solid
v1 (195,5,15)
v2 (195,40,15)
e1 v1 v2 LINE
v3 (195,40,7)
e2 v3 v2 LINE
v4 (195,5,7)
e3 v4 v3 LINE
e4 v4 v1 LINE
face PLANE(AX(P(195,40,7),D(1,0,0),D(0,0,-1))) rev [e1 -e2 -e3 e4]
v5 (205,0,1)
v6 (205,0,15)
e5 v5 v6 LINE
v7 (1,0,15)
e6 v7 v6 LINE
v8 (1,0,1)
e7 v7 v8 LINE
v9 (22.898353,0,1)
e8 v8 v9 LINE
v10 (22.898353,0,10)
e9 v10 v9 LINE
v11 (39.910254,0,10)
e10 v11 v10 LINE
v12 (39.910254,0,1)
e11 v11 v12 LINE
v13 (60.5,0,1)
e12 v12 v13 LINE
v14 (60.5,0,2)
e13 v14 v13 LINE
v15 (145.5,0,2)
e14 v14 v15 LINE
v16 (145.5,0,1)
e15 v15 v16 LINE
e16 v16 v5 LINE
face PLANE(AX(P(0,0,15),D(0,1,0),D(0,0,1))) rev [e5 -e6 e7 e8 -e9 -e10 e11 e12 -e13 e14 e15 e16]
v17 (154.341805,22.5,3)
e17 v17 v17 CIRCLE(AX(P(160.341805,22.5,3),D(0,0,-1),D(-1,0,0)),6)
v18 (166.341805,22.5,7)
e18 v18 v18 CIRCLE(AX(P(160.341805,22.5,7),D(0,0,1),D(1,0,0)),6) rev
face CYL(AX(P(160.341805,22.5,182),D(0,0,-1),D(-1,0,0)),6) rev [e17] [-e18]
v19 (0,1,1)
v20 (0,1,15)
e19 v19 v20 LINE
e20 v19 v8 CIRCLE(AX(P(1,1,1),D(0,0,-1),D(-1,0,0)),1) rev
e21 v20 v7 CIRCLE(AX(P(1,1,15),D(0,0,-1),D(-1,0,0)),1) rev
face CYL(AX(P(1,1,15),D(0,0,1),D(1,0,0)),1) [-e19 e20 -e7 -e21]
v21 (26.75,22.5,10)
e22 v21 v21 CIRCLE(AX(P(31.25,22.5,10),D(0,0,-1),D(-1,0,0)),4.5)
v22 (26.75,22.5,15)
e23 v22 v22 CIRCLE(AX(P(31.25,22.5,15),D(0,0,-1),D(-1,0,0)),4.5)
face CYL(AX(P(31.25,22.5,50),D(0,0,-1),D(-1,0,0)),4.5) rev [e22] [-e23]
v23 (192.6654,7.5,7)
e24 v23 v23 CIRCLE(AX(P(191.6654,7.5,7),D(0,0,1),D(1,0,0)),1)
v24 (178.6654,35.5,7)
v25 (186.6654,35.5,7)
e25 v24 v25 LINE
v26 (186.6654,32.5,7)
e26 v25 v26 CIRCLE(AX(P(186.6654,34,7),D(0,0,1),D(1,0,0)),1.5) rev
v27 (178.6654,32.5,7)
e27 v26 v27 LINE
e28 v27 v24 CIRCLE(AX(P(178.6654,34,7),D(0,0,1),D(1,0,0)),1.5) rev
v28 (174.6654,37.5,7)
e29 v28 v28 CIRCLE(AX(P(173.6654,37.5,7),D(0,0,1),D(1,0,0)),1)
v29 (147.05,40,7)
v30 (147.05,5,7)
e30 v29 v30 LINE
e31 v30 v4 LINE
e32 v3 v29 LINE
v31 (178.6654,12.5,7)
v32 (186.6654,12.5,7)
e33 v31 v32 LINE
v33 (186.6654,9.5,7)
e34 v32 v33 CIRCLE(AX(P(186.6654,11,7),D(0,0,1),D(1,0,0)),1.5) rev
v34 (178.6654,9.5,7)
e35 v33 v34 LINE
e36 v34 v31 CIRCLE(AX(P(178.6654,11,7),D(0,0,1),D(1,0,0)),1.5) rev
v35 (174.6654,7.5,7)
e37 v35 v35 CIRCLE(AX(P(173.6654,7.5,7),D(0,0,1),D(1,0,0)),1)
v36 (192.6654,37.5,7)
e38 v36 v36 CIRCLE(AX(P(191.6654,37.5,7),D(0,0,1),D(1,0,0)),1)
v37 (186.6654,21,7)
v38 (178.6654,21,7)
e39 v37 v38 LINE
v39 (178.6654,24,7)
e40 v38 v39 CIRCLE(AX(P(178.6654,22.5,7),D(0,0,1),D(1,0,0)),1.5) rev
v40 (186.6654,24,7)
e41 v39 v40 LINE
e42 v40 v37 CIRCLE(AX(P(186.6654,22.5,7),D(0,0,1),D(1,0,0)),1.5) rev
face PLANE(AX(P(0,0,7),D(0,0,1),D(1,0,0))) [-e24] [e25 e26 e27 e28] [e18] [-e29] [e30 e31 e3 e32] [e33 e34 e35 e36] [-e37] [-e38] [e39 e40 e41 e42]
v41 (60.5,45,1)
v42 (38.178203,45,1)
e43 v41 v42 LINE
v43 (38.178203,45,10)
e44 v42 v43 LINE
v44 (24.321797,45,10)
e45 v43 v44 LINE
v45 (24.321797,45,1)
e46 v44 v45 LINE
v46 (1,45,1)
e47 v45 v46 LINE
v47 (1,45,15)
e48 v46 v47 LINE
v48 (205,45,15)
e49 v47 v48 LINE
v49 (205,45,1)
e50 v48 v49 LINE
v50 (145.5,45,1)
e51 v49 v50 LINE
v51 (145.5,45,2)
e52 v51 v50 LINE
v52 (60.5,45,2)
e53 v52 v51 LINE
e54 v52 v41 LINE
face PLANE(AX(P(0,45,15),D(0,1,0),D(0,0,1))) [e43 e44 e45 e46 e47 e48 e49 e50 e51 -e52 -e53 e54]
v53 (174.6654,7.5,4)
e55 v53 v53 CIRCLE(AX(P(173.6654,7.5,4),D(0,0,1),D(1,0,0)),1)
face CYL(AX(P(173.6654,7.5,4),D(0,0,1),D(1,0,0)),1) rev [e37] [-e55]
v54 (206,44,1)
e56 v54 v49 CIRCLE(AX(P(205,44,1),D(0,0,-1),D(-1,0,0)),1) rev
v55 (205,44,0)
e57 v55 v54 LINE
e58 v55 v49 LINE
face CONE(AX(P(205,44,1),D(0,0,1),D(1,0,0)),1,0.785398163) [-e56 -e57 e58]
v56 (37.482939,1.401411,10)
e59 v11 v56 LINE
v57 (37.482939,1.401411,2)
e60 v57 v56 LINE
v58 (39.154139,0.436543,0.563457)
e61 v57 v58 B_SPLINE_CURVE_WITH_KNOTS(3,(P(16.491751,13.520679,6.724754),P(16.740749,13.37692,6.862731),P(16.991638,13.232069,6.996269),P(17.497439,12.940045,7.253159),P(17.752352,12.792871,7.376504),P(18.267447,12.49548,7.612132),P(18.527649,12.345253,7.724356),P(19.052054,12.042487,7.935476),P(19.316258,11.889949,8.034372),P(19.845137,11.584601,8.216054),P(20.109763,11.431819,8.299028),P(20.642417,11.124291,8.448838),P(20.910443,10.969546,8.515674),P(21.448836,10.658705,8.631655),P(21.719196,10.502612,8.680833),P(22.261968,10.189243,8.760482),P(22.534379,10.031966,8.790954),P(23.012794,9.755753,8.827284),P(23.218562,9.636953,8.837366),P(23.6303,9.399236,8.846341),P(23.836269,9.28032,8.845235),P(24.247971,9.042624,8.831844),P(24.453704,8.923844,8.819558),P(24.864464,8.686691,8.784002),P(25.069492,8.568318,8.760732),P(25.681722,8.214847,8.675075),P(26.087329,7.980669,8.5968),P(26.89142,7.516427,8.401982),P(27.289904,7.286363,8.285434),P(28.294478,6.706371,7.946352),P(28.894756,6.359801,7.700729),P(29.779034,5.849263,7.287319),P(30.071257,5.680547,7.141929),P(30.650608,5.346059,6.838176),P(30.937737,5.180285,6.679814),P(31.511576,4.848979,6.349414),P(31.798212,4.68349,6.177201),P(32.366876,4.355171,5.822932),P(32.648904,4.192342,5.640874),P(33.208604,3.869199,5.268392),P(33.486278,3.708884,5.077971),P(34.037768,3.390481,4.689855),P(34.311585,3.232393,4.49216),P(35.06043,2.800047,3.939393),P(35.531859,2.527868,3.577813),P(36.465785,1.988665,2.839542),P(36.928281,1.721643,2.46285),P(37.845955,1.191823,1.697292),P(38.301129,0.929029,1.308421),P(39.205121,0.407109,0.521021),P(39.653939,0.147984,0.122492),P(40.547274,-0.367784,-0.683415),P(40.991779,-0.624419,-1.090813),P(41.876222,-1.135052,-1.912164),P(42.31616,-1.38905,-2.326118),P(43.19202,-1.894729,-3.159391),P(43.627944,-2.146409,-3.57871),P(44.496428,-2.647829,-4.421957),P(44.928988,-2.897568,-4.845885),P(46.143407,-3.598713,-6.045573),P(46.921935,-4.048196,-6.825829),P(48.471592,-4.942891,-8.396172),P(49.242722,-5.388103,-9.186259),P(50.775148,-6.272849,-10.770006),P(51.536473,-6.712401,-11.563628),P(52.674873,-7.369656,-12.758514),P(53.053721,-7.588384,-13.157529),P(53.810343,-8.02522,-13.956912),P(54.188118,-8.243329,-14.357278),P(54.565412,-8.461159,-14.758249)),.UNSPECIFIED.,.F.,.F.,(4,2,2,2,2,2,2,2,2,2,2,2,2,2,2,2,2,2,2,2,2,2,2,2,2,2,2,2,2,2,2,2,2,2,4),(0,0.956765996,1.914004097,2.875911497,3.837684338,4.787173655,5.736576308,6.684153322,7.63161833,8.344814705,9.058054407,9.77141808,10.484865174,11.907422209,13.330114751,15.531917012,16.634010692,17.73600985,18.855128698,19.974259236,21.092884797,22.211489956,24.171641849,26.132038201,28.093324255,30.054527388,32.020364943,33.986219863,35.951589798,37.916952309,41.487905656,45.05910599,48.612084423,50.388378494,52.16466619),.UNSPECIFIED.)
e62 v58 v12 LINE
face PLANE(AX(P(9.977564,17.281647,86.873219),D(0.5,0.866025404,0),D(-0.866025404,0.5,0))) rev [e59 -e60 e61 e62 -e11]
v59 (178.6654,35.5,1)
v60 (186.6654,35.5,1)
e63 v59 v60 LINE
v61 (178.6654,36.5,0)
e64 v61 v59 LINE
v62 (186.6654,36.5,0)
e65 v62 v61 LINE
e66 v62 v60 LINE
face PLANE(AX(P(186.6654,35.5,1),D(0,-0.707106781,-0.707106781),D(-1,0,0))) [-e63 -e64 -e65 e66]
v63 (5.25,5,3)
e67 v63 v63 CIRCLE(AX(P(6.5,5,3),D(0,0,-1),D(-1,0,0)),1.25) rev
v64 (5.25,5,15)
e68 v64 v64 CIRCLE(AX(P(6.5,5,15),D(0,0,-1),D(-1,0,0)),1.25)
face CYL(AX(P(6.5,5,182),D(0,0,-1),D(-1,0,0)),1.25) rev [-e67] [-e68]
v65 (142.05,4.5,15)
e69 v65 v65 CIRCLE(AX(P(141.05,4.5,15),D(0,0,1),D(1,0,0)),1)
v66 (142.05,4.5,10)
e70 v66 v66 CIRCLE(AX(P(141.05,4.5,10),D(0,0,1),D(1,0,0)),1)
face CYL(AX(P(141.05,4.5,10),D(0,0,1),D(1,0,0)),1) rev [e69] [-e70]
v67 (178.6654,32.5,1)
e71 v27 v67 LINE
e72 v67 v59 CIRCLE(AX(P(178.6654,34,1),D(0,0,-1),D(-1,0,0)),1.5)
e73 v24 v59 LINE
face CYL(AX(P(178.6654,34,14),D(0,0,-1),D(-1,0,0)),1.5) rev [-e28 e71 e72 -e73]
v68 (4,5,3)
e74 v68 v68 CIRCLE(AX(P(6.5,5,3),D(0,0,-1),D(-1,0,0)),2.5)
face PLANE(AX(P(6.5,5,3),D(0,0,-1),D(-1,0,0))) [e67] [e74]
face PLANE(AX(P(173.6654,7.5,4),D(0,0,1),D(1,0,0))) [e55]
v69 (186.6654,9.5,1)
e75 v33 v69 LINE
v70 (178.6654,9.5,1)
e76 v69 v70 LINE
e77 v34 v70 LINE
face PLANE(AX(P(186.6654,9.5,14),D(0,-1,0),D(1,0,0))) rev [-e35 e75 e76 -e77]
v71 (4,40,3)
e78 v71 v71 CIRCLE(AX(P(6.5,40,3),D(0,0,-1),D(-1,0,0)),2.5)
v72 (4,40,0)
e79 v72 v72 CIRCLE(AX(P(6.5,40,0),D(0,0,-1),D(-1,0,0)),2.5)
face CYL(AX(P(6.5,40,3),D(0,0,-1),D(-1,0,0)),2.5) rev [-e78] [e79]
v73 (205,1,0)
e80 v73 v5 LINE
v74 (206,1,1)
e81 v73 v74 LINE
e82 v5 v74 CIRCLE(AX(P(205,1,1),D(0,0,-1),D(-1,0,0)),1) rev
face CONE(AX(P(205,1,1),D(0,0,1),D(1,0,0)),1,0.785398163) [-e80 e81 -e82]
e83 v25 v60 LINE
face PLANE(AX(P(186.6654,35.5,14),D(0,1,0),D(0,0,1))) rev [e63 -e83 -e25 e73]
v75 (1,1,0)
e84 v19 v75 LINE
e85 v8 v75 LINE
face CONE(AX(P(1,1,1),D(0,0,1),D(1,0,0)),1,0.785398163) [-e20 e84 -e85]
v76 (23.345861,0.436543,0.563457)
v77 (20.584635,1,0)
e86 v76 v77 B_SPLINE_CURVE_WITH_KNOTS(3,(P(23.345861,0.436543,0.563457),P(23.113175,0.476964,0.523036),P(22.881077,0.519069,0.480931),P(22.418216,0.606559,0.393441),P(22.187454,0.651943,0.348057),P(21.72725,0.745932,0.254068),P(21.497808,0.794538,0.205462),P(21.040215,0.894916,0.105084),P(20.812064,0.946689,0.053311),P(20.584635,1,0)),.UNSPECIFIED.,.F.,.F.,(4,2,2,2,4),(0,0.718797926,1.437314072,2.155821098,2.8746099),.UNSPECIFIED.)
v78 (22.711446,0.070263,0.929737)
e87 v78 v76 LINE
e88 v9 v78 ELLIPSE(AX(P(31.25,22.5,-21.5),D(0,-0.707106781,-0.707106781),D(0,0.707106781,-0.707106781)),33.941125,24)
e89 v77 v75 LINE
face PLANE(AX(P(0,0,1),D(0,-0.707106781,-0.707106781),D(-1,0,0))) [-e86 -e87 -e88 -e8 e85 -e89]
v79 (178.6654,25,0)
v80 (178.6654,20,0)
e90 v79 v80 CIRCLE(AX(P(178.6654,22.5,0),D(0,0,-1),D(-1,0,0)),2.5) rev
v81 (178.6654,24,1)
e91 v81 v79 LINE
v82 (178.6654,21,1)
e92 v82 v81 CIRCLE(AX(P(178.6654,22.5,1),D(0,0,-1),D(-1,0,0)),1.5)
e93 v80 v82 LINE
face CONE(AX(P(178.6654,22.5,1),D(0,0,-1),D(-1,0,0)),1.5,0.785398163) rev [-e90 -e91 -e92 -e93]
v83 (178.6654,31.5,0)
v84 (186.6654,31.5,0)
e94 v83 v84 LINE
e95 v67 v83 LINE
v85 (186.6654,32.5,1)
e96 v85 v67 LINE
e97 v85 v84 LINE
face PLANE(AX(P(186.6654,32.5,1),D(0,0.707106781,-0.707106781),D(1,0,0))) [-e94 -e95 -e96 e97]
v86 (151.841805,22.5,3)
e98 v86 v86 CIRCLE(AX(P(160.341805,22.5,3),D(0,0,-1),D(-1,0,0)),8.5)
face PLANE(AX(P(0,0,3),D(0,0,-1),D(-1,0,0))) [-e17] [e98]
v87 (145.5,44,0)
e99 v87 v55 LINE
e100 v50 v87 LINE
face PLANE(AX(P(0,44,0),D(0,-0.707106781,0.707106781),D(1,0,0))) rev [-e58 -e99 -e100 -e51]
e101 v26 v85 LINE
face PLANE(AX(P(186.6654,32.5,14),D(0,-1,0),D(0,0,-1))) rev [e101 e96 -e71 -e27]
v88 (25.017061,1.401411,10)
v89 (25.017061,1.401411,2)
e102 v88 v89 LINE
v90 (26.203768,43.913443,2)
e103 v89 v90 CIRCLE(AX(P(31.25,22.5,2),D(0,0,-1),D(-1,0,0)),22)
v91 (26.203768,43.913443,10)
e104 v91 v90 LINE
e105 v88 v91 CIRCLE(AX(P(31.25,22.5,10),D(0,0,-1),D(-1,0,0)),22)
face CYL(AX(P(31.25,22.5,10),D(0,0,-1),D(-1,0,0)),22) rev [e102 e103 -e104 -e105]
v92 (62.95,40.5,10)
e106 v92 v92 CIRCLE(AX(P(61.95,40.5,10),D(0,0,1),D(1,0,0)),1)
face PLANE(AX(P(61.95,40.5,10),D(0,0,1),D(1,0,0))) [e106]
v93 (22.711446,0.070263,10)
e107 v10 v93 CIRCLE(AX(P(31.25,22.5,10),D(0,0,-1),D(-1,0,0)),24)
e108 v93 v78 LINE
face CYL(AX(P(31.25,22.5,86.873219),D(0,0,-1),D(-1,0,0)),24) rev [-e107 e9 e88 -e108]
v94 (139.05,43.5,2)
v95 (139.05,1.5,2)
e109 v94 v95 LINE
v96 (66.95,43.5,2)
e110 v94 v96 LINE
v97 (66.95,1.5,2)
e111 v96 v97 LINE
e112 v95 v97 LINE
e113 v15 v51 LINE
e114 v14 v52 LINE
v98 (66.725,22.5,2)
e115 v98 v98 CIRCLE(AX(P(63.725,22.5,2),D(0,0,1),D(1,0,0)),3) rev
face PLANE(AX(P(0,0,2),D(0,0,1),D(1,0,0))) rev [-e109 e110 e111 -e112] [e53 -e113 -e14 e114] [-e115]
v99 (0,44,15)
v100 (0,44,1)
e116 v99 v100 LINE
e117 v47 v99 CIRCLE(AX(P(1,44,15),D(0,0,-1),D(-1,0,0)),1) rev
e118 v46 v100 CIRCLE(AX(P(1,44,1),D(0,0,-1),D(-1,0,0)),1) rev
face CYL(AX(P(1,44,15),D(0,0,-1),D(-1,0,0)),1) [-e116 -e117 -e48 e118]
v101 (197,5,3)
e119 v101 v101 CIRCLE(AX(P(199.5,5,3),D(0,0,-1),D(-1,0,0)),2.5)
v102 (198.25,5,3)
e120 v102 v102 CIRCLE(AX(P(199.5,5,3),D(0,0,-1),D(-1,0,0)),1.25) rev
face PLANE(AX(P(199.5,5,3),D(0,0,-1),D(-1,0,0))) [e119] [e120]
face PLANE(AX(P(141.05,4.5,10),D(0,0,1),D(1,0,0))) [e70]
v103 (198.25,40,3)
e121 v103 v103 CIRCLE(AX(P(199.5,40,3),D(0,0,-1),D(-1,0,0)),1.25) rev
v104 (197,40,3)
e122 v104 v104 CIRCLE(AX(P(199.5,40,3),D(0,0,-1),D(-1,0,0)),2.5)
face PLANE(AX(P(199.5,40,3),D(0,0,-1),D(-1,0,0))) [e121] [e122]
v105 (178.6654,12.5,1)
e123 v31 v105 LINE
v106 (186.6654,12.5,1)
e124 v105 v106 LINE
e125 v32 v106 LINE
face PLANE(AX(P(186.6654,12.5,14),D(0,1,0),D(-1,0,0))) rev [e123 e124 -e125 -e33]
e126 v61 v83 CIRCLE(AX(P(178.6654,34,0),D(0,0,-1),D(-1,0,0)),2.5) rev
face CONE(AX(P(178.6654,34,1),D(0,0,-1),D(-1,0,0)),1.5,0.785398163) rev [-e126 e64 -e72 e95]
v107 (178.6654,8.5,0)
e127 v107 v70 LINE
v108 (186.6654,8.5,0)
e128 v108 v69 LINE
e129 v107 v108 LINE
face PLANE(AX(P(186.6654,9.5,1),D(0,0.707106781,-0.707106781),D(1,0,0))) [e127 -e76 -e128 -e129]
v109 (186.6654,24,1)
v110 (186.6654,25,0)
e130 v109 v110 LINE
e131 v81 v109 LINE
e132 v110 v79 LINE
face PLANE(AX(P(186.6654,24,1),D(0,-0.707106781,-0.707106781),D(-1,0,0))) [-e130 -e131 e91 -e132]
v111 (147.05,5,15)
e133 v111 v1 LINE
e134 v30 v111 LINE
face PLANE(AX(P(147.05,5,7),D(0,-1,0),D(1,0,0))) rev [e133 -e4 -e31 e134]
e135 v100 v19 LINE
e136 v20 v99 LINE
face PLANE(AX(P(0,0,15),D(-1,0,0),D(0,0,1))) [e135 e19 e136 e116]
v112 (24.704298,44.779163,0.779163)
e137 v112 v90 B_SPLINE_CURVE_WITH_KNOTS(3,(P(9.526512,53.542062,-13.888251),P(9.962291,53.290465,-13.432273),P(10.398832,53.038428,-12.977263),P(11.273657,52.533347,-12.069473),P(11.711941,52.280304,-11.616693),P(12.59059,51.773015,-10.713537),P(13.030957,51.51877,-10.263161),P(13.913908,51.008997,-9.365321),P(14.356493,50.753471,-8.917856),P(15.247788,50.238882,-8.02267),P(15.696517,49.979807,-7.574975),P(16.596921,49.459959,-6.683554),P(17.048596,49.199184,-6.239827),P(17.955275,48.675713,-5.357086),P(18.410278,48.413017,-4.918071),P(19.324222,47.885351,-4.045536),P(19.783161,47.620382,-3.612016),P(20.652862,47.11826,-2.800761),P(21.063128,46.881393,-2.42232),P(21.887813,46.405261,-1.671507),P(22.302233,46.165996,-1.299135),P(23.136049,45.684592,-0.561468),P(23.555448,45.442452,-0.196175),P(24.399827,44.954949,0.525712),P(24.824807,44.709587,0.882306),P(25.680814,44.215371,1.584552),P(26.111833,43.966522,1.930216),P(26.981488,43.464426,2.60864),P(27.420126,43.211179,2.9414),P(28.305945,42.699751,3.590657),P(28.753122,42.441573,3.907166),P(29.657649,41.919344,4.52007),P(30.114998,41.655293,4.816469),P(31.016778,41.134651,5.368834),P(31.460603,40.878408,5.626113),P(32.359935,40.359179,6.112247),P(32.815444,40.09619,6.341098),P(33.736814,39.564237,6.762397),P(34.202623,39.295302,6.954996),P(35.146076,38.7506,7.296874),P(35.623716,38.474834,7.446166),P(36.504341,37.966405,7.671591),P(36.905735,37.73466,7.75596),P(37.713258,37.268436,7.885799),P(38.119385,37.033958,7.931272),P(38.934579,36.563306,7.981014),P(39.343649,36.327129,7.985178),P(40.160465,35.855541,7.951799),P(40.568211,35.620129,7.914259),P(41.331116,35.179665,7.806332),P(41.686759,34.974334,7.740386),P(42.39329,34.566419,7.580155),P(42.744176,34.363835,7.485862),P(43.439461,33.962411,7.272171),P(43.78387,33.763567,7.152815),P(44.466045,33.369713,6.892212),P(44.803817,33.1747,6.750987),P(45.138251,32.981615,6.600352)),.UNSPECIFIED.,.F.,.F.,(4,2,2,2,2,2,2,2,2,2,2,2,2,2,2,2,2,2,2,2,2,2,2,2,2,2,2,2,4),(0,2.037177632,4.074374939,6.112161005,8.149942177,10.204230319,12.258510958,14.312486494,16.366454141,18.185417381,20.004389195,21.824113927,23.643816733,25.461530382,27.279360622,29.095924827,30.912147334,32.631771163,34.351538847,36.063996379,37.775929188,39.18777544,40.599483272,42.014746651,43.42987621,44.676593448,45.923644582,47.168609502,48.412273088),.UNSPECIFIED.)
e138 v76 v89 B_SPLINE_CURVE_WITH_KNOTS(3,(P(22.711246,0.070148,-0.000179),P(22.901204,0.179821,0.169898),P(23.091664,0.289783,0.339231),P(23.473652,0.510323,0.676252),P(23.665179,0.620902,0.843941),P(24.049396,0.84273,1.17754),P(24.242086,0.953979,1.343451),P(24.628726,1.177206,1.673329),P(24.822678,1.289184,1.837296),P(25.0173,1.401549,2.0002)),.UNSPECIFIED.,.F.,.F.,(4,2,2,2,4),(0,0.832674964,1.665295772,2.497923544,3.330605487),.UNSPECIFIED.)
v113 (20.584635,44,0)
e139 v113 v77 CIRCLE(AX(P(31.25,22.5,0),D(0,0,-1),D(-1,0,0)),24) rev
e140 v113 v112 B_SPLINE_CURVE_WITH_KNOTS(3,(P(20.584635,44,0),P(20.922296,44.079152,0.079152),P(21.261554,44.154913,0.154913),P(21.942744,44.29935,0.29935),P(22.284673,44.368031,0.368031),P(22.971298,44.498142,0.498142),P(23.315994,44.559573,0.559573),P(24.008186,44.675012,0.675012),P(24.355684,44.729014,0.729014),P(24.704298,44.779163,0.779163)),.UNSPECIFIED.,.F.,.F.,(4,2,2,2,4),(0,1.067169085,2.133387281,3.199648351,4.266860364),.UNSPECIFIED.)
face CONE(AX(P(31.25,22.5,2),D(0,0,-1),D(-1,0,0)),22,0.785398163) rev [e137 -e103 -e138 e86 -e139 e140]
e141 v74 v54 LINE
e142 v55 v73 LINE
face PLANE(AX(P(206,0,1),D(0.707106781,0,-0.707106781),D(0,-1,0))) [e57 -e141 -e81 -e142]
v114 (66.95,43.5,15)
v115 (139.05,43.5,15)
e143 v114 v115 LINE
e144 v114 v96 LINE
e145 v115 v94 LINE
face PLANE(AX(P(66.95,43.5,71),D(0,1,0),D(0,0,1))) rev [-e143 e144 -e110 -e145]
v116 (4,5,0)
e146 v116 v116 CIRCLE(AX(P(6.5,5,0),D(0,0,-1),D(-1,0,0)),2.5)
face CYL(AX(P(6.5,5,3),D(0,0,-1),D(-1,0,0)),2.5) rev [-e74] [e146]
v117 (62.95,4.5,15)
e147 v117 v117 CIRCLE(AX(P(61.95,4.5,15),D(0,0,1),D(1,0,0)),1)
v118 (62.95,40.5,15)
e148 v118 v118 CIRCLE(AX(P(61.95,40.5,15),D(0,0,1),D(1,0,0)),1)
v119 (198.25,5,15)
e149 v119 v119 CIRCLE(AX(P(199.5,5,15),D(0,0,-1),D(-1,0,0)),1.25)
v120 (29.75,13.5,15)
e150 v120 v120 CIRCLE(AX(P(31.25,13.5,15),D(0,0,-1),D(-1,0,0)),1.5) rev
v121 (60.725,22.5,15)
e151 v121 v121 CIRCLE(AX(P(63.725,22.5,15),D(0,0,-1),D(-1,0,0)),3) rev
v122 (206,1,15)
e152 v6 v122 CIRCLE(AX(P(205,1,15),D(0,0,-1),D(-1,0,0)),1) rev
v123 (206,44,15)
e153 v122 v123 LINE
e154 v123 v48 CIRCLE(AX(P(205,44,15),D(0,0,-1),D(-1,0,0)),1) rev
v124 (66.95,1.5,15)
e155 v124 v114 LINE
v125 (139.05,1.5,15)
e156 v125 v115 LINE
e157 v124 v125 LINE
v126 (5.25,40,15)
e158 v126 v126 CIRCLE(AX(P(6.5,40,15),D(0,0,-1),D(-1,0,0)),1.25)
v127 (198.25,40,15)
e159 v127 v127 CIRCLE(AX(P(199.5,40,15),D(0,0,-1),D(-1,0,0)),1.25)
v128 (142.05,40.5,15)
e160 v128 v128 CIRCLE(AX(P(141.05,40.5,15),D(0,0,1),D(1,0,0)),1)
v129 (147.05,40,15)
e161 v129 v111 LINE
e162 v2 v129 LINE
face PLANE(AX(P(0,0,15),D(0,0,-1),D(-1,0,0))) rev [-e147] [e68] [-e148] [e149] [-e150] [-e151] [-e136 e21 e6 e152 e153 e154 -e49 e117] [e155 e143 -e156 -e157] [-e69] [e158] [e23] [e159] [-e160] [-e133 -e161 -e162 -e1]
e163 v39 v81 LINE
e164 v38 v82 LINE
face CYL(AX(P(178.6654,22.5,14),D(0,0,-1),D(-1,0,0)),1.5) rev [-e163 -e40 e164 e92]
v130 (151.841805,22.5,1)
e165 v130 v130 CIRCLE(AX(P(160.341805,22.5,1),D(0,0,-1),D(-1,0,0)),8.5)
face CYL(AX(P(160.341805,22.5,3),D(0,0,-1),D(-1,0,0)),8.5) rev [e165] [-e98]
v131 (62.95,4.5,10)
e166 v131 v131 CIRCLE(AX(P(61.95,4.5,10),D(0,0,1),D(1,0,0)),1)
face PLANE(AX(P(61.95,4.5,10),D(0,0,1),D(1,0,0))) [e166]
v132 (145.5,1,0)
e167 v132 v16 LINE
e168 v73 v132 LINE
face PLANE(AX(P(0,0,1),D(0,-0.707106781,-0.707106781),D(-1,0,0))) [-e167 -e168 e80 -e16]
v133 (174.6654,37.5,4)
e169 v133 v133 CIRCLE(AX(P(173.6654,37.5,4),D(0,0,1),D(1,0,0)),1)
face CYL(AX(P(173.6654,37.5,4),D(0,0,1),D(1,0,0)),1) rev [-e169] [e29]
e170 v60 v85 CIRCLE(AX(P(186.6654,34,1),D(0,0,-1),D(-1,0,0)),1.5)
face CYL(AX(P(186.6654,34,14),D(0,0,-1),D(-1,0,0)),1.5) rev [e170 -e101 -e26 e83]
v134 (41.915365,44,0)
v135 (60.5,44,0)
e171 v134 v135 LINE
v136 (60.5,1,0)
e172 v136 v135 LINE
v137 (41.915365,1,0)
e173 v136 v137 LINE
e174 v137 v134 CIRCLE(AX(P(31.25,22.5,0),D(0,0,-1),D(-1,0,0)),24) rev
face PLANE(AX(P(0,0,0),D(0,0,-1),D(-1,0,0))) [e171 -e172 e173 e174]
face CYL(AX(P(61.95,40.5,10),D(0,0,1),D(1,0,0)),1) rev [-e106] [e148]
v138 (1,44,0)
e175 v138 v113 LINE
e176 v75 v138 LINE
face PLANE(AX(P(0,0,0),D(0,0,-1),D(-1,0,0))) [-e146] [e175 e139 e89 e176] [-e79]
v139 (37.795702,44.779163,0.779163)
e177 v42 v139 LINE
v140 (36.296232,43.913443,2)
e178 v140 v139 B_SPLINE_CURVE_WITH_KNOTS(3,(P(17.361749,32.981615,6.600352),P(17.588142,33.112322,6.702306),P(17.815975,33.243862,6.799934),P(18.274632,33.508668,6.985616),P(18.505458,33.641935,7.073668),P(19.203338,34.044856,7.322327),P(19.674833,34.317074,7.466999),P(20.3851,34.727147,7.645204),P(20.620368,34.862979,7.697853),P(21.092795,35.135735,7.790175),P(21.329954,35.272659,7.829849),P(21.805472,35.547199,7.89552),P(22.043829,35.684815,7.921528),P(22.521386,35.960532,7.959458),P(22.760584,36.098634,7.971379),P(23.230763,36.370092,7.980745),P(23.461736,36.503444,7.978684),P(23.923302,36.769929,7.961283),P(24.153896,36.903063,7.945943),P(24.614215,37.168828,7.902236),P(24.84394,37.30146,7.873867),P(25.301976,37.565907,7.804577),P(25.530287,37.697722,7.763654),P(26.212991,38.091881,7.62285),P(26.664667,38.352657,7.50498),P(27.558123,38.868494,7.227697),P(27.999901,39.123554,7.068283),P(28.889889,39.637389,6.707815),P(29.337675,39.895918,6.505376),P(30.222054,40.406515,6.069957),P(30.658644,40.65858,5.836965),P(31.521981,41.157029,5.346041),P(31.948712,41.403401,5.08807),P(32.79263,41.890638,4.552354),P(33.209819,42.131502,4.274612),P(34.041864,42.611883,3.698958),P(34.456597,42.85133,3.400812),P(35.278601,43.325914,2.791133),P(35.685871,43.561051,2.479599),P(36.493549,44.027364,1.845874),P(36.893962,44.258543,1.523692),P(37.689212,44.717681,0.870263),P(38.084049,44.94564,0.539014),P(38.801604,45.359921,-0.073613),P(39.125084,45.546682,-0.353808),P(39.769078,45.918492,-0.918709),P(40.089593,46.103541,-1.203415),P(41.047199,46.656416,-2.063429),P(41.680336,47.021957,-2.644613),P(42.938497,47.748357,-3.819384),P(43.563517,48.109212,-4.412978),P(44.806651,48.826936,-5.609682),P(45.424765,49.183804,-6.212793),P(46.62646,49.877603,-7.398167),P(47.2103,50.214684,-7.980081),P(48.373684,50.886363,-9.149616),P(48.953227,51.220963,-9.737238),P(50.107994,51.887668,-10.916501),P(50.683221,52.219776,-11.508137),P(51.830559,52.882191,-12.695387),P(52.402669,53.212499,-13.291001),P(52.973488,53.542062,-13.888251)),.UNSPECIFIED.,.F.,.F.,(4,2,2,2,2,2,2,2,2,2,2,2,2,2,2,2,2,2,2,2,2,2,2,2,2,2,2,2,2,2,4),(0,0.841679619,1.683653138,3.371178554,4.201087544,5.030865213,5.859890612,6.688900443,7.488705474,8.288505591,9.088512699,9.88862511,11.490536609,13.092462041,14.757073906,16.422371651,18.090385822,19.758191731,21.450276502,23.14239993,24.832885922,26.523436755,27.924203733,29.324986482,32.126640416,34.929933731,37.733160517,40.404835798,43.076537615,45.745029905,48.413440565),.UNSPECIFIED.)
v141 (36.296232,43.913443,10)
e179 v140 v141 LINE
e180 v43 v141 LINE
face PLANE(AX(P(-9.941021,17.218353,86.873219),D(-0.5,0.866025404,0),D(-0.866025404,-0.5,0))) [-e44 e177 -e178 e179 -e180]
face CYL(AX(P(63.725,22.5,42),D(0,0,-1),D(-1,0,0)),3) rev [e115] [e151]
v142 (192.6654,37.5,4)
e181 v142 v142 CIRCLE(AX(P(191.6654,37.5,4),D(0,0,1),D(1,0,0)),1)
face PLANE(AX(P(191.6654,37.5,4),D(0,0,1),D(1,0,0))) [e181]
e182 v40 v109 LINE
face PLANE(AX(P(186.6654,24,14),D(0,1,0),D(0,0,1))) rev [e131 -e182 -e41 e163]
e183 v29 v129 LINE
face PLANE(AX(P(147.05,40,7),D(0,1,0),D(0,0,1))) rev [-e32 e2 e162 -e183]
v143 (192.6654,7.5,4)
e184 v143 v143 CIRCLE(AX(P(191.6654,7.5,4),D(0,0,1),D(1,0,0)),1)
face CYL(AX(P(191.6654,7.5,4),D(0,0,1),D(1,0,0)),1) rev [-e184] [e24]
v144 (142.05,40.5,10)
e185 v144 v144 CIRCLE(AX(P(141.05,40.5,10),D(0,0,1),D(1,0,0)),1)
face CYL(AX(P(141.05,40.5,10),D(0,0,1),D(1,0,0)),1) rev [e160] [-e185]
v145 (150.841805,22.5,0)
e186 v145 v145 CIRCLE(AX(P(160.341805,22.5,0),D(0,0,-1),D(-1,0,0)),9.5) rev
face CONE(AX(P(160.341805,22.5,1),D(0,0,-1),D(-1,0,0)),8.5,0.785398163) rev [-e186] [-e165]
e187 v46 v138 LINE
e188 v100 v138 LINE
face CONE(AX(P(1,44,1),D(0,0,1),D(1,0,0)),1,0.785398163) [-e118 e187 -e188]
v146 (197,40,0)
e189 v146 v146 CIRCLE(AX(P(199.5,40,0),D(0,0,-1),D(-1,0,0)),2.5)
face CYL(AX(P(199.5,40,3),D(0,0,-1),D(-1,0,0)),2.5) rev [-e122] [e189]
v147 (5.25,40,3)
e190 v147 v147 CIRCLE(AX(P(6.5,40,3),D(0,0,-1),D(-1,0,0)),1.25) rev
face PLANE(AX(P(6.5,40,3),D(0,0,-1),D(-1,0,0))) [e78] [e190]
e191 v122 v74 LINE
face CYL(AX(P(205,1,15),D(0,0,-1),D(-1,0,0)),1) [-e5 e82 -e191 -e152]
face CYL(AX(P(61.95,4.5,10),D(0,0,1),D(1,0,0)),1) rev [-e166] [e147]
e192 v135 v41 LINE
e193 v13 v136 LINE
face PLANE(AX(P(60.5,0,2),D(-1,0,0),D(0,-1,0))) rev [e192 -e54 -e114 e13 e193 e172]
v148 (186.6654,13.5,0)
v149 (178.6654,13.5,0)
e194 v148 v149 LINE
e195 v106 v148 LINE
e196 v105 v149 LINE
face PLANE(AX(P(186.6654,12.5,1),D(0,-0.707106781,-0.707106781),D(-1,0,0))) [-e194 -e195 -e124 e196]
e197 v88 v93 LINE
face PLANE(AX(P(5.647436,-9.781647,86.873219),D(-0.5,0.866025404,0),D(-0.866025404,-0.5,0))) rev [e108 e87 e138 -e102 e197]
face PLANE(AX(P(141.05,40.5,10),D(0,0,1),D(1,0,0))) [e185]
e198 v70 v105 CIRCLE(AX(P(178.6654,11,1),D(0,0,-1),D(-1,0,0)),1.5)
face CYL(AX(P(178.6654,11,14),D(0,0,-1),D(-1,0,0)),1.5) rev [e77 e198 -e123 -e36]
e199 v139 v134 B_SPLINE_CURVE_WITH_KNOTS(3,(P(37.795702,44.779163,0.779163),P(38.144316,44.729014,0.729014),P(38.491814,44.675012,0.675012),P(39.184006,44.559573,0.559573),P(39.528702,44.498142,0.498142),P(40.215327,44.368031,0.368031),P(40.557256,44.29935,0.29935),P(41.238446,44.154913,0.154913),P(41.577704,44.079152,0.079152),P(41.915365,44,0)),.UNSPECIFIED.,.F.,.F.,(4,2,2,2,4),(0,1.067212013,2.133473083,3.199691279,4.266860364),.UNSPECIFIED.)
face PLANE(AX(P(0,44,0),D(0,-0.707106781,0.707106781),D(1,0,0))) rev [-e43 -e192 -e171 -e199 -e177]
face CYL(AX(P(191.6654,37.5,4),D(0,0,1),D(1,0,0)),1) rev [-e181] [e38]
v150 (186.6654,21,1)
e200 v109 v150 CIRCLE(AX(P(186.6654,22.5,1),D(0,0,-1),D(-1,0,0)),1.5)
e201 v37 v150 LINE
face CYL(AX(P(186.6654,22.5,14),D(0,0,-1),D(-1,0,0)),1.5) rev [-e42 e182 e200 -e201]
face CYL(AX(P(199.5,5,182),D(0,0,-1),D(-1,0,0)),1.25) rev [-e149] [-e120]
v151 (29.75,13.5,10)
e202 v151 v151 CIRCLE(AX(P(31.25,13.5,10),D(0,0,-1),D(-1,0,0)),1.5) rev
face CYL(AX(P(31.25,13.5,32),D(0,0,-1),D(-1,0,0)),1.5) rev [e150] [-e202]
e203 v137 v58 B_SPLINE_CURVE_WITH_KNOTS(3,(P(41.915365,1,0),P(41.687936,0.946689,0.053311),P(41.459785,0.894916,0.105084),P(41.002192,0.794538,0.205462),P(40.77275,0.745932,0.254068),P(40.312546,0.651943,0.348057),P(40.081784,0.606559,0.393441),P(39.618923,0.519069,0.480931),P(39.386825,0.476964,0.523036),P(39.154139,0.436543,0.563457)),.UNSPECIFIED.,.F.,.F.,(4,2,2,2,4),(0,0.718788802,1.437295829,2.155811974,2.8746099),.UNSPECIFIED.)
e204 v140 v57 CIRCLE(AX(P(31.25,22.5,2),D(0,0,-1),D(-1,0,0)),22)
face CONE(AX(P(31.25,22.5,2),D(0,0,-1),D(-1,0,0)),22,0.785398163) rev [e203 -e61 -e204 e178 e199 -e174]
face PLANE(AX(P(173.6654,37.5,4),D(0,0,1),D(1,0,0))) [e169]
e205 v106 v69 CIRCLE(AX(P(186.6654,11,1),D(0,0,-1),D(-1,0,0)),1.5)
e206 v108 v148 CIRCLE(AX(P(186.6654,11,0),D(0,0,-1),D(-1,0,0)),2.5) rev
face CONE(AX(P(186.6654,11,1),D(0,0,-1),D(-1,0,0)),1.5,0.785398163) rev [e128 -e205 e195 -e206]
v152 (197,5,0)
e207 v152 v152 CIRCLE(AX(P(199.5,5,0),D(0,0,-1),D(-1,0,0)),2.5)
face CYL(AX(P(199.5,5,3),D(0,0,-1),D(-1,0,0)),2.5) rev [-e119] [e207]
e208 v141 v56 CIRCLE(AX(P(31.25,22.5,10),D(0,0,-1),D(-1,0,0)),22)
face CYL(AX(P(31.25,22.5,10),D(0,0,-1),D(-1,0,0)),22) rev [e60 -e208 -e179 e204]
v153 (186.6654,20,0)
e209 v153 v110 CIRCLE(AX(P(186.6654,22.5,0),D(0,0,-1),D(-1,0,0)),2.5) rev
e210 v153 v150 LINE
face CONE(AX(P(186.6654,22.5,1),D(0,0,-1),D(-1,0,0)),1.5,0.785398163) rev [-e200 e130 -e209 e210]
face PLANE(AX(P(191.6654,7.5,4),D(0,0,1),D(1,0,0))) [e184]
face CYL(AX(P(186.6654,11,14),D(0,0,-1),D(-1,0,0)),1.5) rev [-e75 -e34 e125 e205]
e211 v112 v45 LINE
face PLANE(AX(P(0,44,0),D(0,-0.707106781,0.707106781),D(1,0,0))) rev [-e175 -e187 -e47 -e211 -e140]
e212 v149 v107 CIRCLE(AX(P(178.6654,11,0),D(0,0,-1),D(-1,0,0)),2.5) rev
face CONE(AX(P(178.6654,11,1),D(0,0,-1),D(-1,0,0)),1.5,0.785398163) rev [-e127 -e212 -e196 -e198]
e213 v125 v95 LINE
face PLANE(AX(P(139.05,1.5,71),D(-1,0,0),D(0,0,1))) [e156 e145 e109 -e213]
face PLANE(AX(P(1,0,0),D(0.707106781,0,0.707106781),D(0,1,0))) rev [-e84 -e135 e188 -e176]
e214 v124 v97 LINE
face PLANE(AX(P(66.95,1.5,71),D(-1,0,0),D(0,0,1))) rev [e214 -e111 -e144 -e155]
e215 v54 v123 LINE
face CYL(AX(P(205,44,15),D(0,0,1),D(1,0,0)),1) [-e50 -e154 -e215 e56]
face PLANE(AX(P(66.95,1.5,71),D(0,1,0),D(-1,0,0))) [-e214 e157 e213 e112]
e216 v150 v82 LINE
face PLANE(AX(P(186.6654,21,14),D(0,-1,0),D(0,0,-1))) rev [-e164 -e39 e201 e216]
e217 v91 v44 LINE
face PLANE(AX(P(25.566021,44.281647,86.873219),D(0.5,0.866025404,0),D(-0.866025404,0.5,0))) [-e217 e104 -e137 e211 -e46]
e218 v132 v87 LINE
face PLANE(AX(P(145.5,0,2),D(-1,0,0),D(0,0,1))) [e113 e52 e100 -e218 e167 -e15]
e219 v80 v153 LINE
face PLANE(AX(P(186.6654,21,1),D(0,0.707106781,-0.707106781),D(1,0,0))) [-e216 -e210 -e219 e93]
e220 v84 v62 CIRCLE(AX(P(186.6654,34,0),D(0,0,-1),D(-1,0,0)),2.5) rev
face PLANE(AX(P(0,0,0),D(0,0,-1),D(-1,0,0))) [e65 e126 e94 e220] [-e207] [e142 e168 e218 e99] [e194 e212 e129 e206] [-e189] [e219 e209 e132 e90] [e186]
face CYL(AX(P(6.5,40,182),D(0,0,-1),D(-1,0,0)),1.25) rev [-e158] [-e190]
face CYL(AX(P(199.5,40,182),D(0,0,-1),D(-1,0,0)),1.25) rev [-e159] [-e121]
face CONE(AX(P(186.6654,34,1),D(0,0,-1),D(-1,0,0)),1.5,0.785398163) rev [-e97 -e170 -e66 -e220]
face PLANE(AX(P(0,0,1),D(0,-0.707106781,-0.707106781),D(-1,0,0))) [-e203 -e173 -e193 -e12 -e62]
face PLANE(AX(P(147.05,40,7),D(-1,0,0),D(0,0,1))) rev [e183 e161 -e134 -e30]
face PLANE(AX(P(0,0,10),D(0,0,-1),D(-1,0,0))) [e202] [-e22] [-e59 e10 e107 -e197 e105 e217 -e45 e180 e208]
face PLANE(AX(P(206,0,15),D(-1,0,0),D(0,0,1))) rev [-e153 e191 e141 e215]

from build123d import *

# Parameters (mm, degrees)
SKETCH_1_W               = 206
SKETCH_1_H               = 45
EXTRUDE_1_DEPTH          = 15
SKETCH_1_4_W             = 85
SKETCH_1_4_H             = 45
CUT_EXTRUDE_1_DEPTH      = 2
SKETCH_1_5_W             = 72.1
SKETCH_1_5_H             = 42
CUT_EXTRUDE_2_DEPTH      = 71
SKETCH_1_6_R             = 3
CUT_EXTRUDE_3_DEPTH      = 42
SKETCH_2_R               = 22
SKETCH_2_R_2             = 4.5
CUT_EXTRUDE_4_DEPTH      = 10
SKETCH_2_3_R             = 4.5
CUT_EXTRUDE_5_DEPTH      = 50
CUT_EXTRUDE_6_DEPTH      = 17
CUT_EXTRUDE_6_DEPTH_BACK = 44
SKETCH_4_R               = 1.5
CUT_EXTRUDE_7_DEPTH      = 14
CHAMFER_1_SIZE           = 1
CHAMFER_2_SIZE           = 2
CUT_EXTRUDE_START        = -10
CUT_EXTRUDE_9_DEPTH      = 11
SKETCH_7_R               = 6
CUT_EXTRUDE_10_DEPTH     = 182
SKETCH_7_4_R             = 8.5
CUT_EXTRUDE_11_DEPTH     = 3
CHAMFER_3_SIZE           = 1
SKETCH_9_R               = 1.25
CUT_EXTRUDE_12_DEPTH     = 182
SKETCH_9_3_R             = 2.5
CUT_EXTRUDE_13_DEPTH     = 3
FILLET_1_R               = 1
SKETCH_10_W              = 47.95
SKETCH_10_H              = 35
CUT_EXTRUDE_14_DEPTH     = 8
SKETCH_11_R              = 1
CUT_EXTRUDE_15_DEPTH     = 3
CHAMFER_4_SIZE           = 1
SKETCH_12_R              = 1
CUT_EXTRUDE_16_DEPTH     = 5


with BuildPart() as part:
    # 草图1 → 凸台-拉伸1 (new body)
    with BuildSketch(Plane.XY):
        with Locations((103, 22.5)):
            Rectangle(SKETCH_1_W, SKETCH_1_H)
    extrude(amount=EXTRUDE_1_DEPTH)

    # 草图1<4> → 切除-拉伸1 (cut)
    with BuildSketch(Plane.XY):
        with Locations((103, 22.5)):
            Rectangle(SKETCH_1_4_W, SKETCH_1_4_H)
    extrude(amount=CUT_EXTRUDE_1_DEPTH, mode=Mode.SUBTRACT)

    # 草图1<5> → 切除-拉伸2 (cut)
    with BuildSketch(Plane.XY):
        with Locations((103, 22.5)):
            Rectangle(SKETCH_1_5_W, SKETCH_1_5_H)
    extrude(amount=CUT_EXTRUDE_2_DEPTH, mode=Mode.SUBTRACT)

    # 草图1<6> → 切除-拉伸3 (cut)
    with BuildSketch(Plane.XY):
        with Locations(Location((63.725, 22.5, 0), (0, 0, 180))):
            Circle(SKETCH_1_6_R)
    extrude(amount=CUT_EXTRUDE_3_DEPTH, mode=Mode.SUBTRACT)

    # 草图2 → 切除-拉伸4 (cut)
    with BuildSketch(Plane(origin=(0, 0, 0), x_dir=(-1, 0, 0), z_dir=(0, 0, -1))):
        with Locations((-31.25, 22.5)):
            Circle(SKETCH_2_R)
        with Locations((-31.25, 22.5)):
            Circle(SKETCH_2_R_2, mode=Mode.SUBTRACT)
    extrude(amount=-CUT_EXTRUDE_4_DEPTH, mode=Mode.SUBTRACT)

    # 草图2<3> → 切除-拉伸5 (cut)
    with BuildSketch(Plane(origin=(0, 0, 0), x_dir=(-1, 0, 0), z_dir=(0, 0, -1))):
        with Locations((-31.25, 22.5)):
            Circle(SKETCH_2_3_R)
    extrude(amount=-CUT_EXTRUDE_5_DEPTH, mode=Mode.SUBTRACT)

    # 草图4 → 切除-拉伸6 (cut, two sides: drawn at the far end of the back side and taken through both)
    with BuildSketch(Plane.XY.offset(15).offset(-CUT_EXTRUDE_6_DEPTH_BACK)):
        with Locations(Location((31.25, 13.5, 0), (0, 0, 180))):
            Circle(SKETCH_4_R)
    extrude(amount=CUT_EXTRUDE_6_DEPTH + CUT_EXTRUDE_6_DEPTH_BACK, mode=Mode.SUBTRACT)

    # 草图5 → 切除-拉伸7 (cut)
    with BuildSketch(Plane(origin=(0, 0, 0), x_dir=(-1, 0, 0), z_dir=(0, 0, -1))):
        with BuildLine():
            Line((-186.665399759, 35.5), (-178.665399759, 35.5))
            ThreePointArc((-178.665399759, 35.5), (-177.165399759, 34), (-178.665399759, 32.5))
            Line((-178.665399759, 32.5), (-186.665399759, 32.5))
            ThreePointArc((-186.665399759, 32.5), (-188.165399759, 34), (-186.665399759, 35.5))
        make_face()
        with BuildLine():
            Line((-186.665399759, 12.5), (-178.665399759, 12.5))
            ThreePointArc((-178.665399759, 12.5), (-177.165399759, 11), (-178.665399759, 9.5))
            Line((-178.665399759, 9.5), (-186.665399759, 9.5))
            ThreePointArc((-186.665399759, 9.5), (-188.165399759, 11), (-186.665399759, 12.5))
        make_face()
        with BuildLine():
            Line((-186.665399759, 24), (-178.665399759, 24))
            ThreePointArc((-178.665399759, 24), (-177.165399759, 22.5), (-178.665399759, 21))
            Line((-178.665399759, 21), (-186.665399759, 21))
            ThreePointArc((-186.665399759, 21), (-188.165399759, 22.5), (-186.665399759, 24))
        make_face()
    extrude(amount=-CUT_EXTRUDE_7_DEPTH, mode=Mode.SUBTRACT)

    # 倒角1
    chamfer_1_edges = [part.edges().sort_by_distance(p)[0] for p in [
        (182.665399759, 21, 0),
        (177.165399759, 22.5, 0),
        (182.665399759, 24, 0),
        (188.165399759, 34, 0),
        (182.665399759, 32.5, 0),
        (177.165399759, 34, 0),
        (182.665399759, 35.5, 0),
        (188.165399759, 11, 0),
        (182.665399759, 9.5, 0),
        (177.165399759, 11, 0),
        (182.665399759, 12.5, 0),
        (188.165399759, 22.5, 0),
    ]]
    chamfer(chamfer_1_edges, length=CHAMFER_1_SIZE)

    # 倒角2
    # the kernel refuses this chamfer: 2 mm, written as the material it takes off along each edge
    with BuildSketch(Plane(origin=(31.25, 22.5, 0), x_dir=(-1, 0, 0), z_dir=(0, -1, 0))) as chamfer_2_piece_1:
        Polygon((22 + CHAMFER_2_SIZE, 0), (22, -CHAMFER_2_SIZE), (22, 0), align=None)
    revolve(axis=Axis((31.25, 22.5, 0), (0, 0, -1)), mode=Mode.SUBTRACT)

    # 切除-拉伸9: read off the stored shape, not the designer's step
    # 切除-拉伸9 outline → 切除-拉伸9 (cut)
    with BuildSketch(Plane(origin=(0, 0, 0), x_dir=(-1, 0, 0), z_dir=(0, 0, -1)).offset(CUT_EXTRUDE_START)):
        with BuildLine():
            ThreePointArc((-25.017060641, 1.401410783), (-31.25, 0.5), (-37.482939359, 1.401410783))
            Line((-37.482939359, 1.401410783), (-39.910254038, 0))
            Line((-39.910254038, 0), (-22.898353456, 0))
            ThreePointArc((-22.898353456, 0), (-22.804826441, 0.034937268), (-22.711445573, 0.070263303))
            Line((-22.711445573, 0.070263303), (-25.017060641, 1.401410783))
        make_face()
        with BuildLine():
            Line((-38.17820323, 45), (-36.296231546, 43.913443142))
            ThreePointArc((-36.296231546, 43.913443142), (-31.25, 44.5), (-26.203768454, 43.913443142))
            Line((-26.203768454, 43.913443142), (-24.32179677, 45))
            Line((-24.32179677, 45), (-38.17820323, 45))
        make_face()
    extrude(amount=CUT_EXTRUDE_9_DEPTH, mode=Mode.SUBTRACT)

    # 草图7 → 切除-拉伸10 (cut)
    with BuildSketch(Plane(origin=(0, 0, 0), x_dir=(-1, 0, 0), z_dir=(0, 0, -1))):
        with Locations((-160.341805483, 22.5)):
            Circle(SKETCH_7_R)
    extrude(amount=-CUT_EXTRUDE_10_DEPTH, mode=Mode.SUBTRACT)

    # 草图7<4> → 切除-拉伸11 (cut)
    with BuildSketch(Plane(origin=(0, 0, 0), x_dir=(-1, 0, 0), z_dir=(0, 0, -1))):
        with Locations((-160.341805483, 22.5)):
            Circle(SKETCH_7_4_R)
    extrude(amount=-CUT_EXTRUDE_11_DEPTH, mode=Mode.SUBTRACT)

    # 倒角3
    chamfer_3_edges = [part.edges().sort_by_distance(p)[0] for p in [
        (168.841805483, 22.5, 0),
    ]]
    chamfer(chamfer_3_edges, length=CHAMFER_3_SIZE)

    # 草图9 → 切除-拉伸12 (cut)
    with BuildSketch(Plane(origin=(0, 0, 0), x_dir=(-1, 0, 0), z_dir=(0, 0, -1))):
        with Locations((-199.5, 40)):
            Circle(SKETCH_9_R)
        with Locations((-199.5, 5)):
            Circle(SKETCH_9_R)
        with Locations((-6.5, 5)):
            Circle(SKETCH_9_R)
        with Locations((-6.5, 40)):
            Circle(SKETCH_9_R)
    extrude(amount=-CUT_EXTRUDE_12_DEPTH, mode=Mode.SUBTRACT)

    # 草图9<3> → 切除-拉伸13 (cut)
    with BuildSketch(Plane(origin=(0, 0, 0), x_dir=(-1, 0, 0), z_dir=(0, 0, -1))):
        with Locations((-199.5, 40)):
            Circle(SKETCH_9_3_R)
        with Locations((-199.5, 5)):
            Circle(SKETCH_9_3_R)
        with Locations((-6.5, 5)):
            Circle(SKETCH_9_3_R)
        with Locations((-6.5, 40)):
            Circle(SKETCH_9_3_R)
    extrude(amount=-CUT_EXTRUDE_13_DEPTH, mode=Mode.SUBTRACT)

    # 圆角1
    fillet_1_edges = [part.edges().sort_by_distance(p)[0] for p in [
        (0, 0, 7.5),
        (206, 0, 7.5),
        (206, 45, 7.5),
        (0, 45, 7.5),
    ]]
    fillet(fillet_1_edges, radius=FILLET_1_R)

    # 草图10 → 切除-拉伸14 (cut)
    with BuildSketch(Plane.XY.offset(15)):
        with Locations((171.025, 22.5)):
            Rectangle(SKETCH_10_W, SKETCH_10_H)
    extrude(amount=-CUT_EXTRUDE_14_DEPTH, mode=Mode.SUBTRACT)

    # 草图11 → 切除-拉伸15 (cut)
    with BuildSketch(Plane.XY.offset(7)):
        with Locations((191.665399759, 37.5)):
            Circle(SKETCH_11_R)
        with Locations((173.665399759, 37.5)):
            Circle(SKETCH_11_R)
        with Locations((173.665399759, 7.5)):
            Circle(SKETCH_11_R)
        with Locations((191.665399759, 7.5)):
            Circle(SKETCH_11_R)
    extrude(amount=-CUT_EXTRUDE_15_DEPTH, mode=Mode.SUBTRACT)

    # 倒角4
    # the kernel refuses this chamfer: 1 mm, written as the material it takes off along each edge
    with BuildSketch(Plane(origin=(142.928317012, 0, 0), x_dir=(0, 1, 0), z_dir=(1, 0, 0)), Plane(origin=(205, 45, 0), x_dir=(0, -1, 0), z_dir=(-1, 0, 0))) as chamfer_4_piece_1:
        Polygon((CHAMFER_4_SIZE, 0), (0, CHAMFER_4_SIZE), (0, 0), align=None)
    extrude(amount=62.071682988, mode=Mode.SUBTRACT)
    with BuildSketch(Plane(origin=(205, 1, 0), x_dir=(0, -1, 0), z_dir=(-1, 0, 0))) as chamfer_4_piece_2:
        Polygon((1 - CHAMFER_4_SIZE, 0), (1, CHAMFER_4_SIZE), (1, 0), align=None)
    revolve(axis=Axis((205, 1, 0), (0, 0, 1)), revolution_arc=90, mode=Mode.SUBTRACT)
    with BuildSketch(Plane(origin=(206, 1, 0), x_dir=(-1, 0, 0), z_dir=(0, 1, 0)), Plane(origin=(0, 44, 0), x_dir=(1, 0, 0), z_dir=(0, -1, 0))) as chamfer_4_piece_3:
        Polygon((CHAMFER_4_SIZE, 0), (0, CHAMFER_4_SIZE), (0, 0), align=None)
    extrude(amount=43, mode=Mode.SUBTRACT)
    with BuildSketch(Plane(origin=(205, 44, 0), x_dir=(0, 1, 0), z_dir=(-1, 0, 0))) as chamfer_4_piece_4:
        Polygon((1 - CHAMFER_4_SIZE, 0), (1, -CHAMFER_4_SIZE), (1, 0), align=None)
    revolve(axis=Axis((205, 44, 0), (0, 0, -1)), revolution_arc=90, mode=Mode.SUBTRACT)
    with BuildSketch(Plane(origin=(37.33857105, 0, 0), x_dir=(0, 0, 1), z_dir=(1, 0, 0))) as chamfer_4_piece_5:
        Polygon((CHAMFER_4_SIZE, 0), (0, -CHAMFER_4_SIZE), (0, 0), align=None)
    extrude(amount=25.733111938, mode=Mode.SUBTRACT)
    with BuildSketch(Plane(origin=(63.071682988, 45, 0), x_dir=(0, 0, 1), z_dir=(-1, 0, 0))) as chamfer_4_piece_6:
        Polygon((CHAMFER_4_SIZE, 0), (0, -CHAMFER_4_SIZE), (0, 0), align=None)
    extrude(amount=27.841897523, mode=Mode.SUBTRACT)
    with BuildSketch(Plane(origin=(1, 0, 0), x_dir=(0, 0, 1), z_dir=(1, 0, 0))) as chamfer_4_piece_7:
        Polygon((CHAMFER_4_SIZE, 0), (0, -CHAMFER_4_SIZE), (0, 0), align=None)
    extrude(amount=24.470036444, mode=Mode.SUBTRACT)
    with BuildSketch(Plane(origin=(27.270214535, 45, 0), x_dir=(0, 0, 1), z_dir=(-1, 0, 0))) as chamfer_4_piece_8:
        Polygon((CHAMFER_4_SIZE, 0), (0, -CHAMFER_4_SIZE), (0, 0), align=None)
    extrude(amount=26.270214535, mode=Mode.SUBTRACT)
    with BuildSketch(Plane(origin=(1, 1, 0), x_dir=(0, -1, 0), z_dir=(1, 0, 0))) as chamfer_4_piece_9:
        Polygon((1 - CHAMFER_4_SIZE, 0), (1, -CHAMFER_4_SIZE), (1, 0), align=None)
    revolve(axis=Axis((1, 1, 0), (0, 0, -1)), revolution_arc=90, mode=Mode.SUBTRACT)
    with BuildSketch(Plane(origin=(1, 44, 0), x_dir=(0, 1, 0), z_dir=(1, 0, 0))) as chamfer_4_piece_10:
        Polygon((1 - CHAMFER_4_SIZE, 0), (1, CHAMFER_4_SIZE), (1, 0), align=None)
    revolve(axis=Axis((1, 44, 0), (0, 0, 1)), revolution_arc=90, mode=Mode.SUBTRACT)

    # 草图12 → 切除-拉伸16 (cut)
    with BuildSketch(Plane.XY.offset(15)):
        with Locations((61.95, 40.5)):
            Circle(SKETCH_12_R)
        with Locations((61.95, 4.5)):
            Circle(SKETCH_12_R)
        with Locations((141.05, 4.5)):
            Circle(SKETCH_12_R)
        with Locations((141.05, 40.5)):
            Circle(SKETCH_12_R)
    extrude(amount=-CUT_EXTRUDE_16_DEPTH, mode=Mode.SUBTRACT)


solid = part.part
